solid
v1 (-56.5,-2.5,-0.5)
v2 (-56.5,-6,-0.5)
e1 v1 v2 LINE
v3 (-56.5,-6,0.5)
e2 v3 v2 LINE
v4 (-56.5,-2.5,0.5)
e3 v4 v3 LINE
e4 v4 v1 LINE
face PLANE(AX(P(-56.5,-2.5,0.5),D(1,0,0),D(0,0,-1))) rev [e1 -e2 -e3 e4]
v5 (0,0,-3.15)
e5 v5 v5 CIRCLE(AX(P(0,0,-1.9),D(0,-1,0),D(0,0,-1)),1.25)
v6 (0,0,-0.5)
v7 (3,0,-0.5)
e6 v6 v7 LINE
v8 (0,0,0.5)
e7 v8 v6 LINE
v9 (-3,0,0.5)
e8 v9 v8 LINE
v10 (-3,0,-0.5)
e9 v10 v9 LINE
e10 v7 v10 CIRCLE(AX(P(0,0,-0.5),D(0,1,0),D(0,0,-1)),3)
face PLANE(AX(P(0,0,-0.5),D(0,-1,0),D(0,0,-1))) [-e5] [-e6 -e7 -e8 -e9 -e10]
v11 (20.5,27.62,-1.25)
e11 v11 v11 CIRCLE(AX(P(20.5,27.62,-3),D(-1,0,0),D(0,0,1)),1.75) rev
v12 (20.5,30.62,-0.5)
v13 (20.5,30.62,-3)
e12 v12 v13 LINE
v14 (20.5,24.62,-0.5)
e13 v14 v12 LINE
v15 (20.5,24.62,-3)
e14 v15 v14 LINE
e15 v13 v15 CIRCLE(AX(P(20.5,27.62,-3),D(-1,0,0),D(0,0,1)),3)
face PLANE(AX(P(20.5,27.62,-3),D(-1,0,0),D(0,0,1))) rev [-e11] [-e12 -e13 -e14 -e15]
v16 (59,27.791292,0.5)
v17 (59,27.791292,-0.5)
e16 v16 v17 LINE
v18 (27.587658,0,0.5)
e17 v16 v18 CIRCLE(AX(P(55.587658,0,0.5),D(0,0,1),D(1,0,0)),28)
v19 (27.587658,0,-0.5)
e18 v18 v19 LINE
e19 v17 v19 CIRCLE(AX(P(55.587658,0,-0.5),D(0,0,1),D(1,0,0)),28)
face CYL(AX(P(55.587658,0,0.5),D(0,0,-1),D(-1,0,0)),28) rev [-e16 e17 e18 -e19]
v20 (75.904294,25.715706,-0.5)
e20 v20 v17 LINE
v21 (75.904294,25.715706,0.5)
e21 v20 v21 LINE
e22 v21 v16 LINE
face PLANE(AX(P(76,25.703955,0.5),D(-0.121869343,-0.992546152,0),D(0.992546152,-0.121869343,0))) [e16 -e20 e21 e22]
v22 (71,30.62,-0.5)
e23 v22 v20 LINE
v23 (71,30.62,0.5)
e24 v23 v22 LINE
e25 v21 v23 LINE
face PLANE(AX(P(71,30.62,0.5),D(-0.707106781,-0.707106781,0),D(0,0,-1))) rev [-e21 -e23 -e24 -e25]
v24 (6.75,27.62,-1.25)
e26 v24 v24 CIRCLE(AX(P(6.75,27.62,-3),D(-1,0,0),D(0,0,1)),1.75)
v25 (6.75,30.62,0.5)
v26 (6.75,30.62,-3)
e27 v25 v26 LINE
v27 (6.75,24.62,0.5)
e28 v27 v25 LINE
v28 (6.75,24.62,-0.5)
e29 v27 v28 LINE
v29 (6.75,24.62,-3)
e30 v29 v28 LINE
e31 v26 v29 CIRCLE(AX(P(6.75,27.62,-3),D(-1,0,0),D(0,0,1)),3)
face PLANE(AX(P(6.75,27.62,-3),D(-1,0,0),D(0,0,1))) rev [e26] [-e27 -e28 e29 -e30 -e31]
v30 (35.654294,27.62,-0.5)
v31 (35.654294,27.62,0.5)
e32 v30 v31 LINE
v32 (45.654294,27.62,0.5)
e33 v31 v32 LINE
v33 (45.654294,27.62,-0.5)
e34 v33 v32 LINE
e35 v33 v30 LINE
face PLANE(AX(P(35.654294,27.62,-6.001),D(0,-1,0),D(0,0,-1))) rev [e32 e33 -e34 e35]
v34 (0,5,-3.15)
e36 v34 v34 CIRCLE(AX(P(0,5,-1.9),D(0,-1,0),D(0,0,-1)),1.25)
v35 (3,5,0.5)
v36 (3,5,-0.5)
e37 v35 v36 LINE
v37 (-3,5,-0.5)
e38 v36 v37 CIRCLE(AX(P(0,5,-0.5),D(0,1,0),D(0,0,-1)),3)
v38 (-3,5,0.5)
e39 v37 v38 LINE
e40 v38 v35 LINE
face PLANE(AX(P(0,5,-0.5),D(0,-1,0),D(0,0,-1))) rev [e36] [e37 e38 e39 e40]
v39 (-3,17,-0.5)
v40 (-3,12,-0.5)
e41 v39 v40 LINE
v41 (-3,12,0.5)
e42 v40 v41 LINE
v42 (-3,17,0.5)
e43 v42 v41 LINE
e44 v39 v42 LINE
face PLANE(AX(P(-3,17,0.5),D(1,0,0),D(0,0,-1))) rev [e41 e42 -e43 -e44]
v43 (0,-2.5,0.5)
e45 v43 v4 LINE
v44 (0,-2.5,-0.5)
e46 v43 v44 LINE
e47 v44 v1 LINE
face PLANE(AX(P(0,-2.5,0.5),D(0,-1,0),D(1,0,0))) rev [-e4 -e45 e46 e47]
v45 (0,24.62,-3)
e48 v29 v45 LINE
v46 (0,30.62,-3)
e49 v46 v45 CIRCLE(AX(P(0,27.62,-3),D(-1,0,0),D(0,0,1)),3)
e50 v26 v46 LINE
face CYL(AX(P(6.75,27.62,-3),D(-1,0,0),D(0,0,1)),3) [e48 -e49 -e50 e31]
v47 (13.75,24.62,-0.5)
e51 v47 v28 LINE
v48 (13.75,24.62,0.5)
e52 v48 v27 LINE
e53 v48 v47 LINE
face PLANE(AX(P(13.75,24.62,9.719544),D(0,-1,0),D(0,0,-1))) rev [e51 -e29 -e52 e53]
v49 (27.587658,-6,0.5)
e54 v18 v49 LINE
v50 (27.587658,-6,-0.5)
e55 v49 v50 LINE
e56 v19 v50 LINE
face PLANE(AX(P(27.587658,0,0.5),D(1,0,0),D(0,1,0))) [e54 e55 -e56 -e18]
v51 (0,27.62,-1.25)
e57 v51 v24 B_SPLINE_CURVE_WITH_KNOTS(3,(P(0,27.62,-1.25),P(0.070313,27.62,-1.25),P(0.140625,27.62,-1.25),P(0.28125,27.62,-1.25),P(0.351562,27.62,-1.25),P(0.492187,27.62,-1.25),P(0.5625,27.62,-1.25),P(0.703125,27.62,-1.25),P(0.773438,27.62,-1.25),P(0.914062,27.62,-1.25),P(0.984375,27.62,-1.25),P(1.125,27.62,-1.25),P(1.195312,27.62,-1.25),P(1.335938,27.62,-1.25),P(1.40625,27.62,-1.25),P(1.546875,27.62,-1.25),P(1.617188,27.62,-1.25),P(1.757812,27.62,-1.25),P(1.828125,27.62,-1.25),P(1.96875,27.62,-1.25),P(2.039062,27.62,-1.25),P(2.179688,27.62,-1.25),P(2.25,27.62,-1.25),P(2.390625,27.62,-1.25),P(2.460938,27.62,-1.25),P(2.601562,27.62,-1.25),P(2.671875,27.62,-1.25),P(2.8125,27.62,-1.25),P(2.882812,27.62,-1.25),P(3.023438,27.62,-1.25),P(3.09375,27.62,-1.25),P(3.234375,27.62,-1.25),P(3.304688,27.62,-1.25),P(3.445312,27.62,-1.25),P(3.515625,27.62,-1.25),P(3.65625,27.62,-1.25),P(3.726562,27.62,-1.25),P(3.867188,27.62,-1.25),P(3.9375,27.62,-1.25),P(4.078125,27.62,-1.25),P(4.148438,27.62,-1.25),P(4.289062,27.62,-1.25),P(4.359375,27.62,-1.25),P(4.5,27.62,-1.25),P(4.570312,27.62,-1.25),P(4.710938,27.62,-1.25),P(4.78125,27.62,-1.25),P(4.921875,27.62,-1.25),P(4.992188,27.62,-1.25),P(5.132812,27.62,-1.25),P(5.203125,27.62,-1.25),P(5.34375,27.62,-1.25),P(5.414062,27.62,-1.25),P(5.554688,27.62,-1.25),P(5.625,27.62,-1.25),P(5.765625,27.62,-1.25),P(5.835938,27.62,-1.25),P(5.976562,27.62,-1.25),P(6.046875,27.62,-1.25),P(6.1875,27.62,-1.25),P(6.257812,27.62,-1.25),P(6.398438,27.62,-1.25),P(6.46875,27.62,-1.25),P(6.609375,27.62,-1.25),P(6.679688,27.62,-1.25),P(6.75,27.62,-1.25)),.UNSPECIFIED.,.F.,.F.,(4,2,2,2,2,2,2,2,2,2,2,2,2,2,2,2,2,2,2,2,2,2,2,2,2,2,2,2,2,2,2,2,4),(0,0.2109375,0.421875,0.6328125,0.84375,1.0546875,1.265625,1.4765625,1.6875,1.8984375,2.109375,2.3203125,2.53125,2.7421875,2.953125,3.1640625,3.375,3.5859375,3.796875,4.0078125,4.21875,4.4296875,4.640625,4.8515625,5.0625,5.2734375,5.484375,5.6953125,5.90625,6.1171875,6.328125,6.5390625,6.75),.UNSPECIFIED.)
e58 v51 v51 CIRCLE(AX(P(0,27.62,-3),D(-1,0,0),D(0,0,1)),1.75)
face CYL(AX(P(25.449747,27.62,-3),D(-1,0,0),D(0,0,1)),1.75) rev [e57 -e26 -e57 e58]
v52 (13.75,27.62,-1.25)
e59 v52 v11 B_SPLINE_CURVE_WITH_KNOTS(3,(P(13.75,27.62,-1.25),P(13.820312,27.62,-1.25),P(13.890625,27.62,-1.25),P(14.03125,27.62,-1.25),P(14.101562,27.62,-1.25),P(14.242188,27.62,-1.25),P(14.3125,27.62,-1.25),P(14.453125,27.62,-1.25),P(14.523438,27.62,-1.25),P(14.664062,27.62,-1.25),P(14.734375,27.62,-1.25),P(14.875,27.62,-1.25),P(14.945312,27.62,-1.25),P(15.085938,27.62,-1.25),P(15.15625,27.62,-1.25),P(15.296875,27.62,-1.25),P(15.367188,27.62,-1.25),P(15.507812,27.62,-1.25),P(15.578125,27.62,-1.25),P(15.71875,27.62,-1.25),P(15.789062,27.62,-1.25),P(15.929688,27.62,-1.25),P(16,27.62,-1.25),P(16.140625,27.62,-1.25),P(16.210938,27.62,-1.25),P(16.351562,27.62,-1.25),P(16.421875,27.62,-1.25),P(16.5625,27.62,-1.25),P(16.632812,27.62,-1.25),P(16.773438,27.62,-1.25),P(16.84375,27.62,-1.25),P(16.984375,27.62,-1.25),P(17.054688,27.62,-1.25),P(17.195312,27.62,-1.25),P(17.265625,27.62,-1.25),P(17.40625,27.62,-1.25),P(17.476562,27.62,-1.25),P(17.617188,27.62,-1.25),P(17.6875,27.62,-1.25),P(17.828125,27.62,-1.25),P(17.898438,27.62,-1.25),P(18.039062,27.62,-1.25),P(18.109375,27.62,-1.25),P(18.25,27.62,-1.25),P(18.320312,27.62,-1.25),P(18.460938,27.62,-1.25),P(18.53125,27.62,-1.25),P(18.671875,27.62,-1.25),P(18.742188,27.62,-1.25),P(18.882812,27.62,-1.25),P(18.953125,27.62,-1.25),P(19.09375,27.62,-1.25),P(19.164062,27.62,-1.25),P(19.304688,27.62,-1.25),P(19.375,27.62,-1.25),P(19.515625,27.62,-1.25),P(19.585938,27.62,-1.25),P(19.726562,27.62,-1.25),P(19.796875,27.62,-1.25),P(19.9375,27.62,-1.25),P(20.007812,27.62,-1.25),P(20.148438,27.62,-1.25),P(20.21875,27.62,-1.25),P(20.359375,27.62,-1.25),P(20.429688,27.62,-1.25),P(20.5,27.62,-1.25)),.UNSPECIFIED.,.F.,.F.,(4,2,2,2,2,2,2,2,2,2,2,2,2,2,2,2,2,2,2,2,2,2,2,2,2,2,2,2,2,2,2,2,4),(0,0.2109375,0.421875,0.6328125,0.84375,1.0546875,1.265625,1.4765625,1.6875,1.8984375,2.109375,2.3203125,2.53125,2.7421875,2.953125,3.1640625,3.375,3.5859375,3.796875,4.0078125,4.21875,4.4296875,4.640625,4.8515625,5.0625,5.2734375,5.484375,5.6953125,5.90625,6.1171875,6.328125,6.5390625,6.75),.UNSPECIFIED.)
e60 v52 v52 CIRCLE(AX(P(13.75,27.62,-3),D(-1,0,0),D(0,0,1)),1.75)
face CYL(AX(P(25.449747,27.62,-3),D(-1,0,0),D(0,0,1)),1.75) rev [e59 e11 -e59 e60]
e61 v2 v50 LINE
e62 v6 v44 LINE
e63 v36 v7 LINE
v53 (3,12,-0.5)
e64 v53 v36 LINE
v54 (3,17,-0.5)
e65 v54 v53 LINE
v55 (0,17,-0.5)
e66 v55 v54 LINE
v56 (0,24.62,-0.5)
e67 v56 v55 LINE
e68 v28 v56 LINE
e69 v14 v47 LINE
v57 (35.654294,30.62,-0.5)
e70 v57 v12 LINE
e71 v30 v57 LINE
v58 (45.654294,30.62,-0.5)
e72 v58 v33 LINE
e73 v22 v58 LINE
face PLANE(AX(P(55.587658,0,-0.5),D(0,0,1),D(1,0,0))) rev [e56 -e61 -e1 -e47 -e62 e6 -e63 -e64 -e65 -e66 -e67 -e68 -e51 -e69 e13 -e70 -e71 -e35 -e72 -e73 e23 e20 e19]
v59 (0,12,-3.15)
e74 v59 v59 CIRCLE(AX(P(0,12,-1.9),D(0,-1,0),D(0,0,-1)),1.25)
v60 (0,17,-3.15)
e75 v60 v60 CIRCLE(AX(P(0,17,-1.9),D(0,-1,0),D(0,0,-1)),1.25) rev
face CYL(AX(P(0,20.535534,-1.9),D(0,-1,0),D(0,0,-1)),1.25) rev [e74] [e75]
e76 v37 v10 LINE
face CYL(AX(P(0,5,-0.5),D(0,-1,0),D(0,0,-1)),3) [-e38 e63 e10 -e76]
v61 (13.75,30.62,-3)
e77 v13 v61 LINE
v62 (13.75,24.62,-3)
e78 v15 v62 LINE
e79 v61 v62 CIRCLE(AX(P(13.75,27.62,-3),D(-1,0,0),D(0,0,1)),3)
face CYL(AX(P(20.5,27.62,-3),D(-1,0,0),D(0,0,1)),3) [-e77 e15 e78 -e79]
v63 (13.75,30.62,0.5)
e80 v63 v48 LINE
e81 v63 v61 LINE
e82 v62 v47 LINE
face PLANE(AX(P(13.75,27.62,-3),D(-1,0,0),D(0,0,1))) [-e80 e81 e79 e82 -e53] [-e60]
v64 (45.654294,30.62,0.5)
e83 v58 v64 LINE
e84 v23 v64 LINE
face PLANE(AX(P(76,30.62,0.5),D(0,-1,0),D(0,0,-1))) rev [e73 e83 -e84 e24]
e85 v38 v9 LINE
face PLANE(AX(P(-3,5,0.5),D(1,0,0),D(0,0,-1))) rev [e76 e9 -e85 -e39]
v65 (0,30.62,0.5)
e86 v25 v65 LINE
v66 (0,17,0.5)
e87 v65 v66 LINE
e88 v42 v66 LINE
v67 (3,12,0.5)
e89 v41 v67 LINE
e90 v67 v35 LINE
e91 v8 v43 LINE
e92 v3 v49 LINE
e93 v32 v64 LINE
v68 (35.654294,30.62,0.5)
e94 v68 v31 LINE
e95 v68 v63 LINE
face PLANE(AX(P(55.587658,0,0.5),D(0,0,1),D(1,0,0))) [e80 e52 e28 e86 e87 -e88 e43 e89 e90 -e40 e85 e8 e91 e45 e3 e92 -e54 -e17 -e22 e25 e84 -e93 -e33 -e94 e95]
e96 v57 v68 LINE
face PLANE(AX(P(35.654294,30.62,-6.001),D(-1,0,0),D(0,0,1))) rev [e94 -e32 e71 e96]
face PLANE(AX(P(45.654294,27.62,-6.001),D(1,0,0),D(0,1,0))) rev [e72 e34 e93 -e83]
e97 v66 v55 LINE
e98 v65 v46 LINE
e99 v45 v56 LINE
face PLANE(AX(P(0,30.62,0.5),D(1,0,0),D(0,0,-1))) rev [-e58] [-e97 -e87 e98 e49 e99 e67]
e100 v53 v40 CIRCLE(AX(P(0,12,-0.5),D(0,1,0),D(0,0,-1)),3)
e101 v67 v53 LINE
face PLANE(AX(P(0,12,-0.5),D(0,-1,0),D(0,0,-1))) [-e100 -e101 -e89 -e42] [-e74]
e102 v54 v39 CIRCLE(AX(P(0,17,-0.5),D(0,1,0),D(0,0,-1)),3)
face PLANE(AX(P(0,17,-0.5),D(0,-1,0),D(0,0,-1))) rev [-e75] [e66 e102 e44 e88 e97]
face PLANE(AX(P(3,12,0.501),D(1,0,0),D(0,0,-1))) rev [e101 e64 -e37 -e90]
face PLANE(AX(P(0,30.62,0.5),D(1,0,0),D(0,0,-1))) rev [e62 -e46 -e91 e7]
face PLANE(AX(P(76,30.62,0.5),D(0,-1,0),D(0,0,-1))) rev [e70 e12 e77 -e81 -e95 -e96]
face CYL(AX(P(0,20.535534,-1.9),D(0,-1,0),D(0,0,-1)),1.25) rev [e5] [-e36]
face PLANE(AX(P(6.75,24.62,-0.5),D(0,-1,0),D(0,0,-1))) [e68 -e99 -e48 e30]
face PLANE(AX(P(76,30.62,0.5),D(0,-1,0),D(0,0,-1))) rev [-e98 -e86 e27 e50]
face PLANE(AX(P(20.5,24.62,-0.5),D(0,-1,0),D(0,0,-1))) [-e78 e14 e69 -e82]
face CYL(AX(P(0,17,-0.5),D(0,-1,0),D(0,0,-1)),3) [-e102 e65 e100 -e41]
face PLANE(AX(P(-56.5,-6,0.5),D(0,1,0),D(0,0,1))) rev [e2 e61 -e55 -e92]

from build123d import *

# Parameters (mm, degrees)
BOSS_EXTRUDE1_DEPTH = 0.5
BOSS_EXTRUDE6_DEPTH = 5
BOSS_EXTRUDE5_DEPTH = 6.75
LPATTERN2_COUNT     = 2
LPATTERN2_PITCH     = 13.75
CUT_EXTRUDE4_REACH  = 84.156
SKETCH10_R          = 1.75
LPATTERN3_COUNT     = 2
LPATTERN3_PITCH     = 12
CUT_EXTRUDE5_REACH  = 84.156
SKETCH12_R          = 1.25
SKETCH13_W          = 7
SKETCH13_H          = 6
CUT_EXTRUDE6_DEPTH  = 1
CHAMFER1_SIZE       = 5
CUT_EXTRUDE8_REACH  = 84.105
SKETCH15_W          = 10
SKETCH15_H          = 3
CUT_EXTRUDE9_REACH  = 84.032
SKETCH16_W          = 3
SKETCH16_H          = 7


with BuildPart() as part:
    # Sketch1 → Boss-Extrude1 (new, symmetric)
    with BuildSketch(Plane.XY):
        with BuildLine():
            Line((-56.5, -6), (27.587658385, -6))
            Line((27.587658385, -6), (27.587658385, 0))
            ThreePointArc((27.587658385, 0), (37.034297035, 20.970760182), (59, 27.791292246))
            Line((59, 27.791292246), (76, 25.703954711))
            Line((76, 25.703954711), (76, 30.62))
            Line((76, 30.62), (0, 30.62))
            Line((0, 30.62), (0, -2.5))
            Line((0, -2.5), (-56.5, -2.5))
            Line((-56.5, -2.5), (-56.5, -6))
        make_face()
    extrude(amount=BOSS_EXTRUDE1_DEPTH, both=True)

    # Sketch5 → Boss-Extrude6 (add)
    with BuildSketch(Plane(origin=(0, 0, 0), x_dir=(1, 0, 0), z_dir=(0, 1, 0))):
        with BuildLine():
            Line((0, 0.5), (3, 0.5))
            ThreePointArc((3, 0.5), (0, 3.5), (-3, 0.5))
            Line((-3, 0.5), (-3, -0.5))
            Line((-3, -0.5), (0, -0.5))
            Line((0, -0.5), (0, 0.5))
        make_face()
    boss_extrude6 = extrude(amount=BOSS_EXTRUDE6_DEPTH)

    # Sketch9 → Boss-Extrude5 (add)
    with BuildSketch(Plane.ZY):
        with BuildLine():
            Line((-0.5, 30.62), (-3, 30.62))
            ThreePointArc((-3, 30.62), (-6, 27.62), (-3, 24.62))
            Line((-3, 24.62), (-0.5, 24.62))
            Line((-0.5, 24.62), (-0.5, 30.62))
        make_face()
    boss_extrude5 = extrude(amount=-BOSS_EXTRUDE5_DEPTH)

    # LPattern2: Boss-Extrude5 ×2
    with Locations(*[(i * LPATTERN2_PITCH, 0, 0) for i in range(1, LPATTERN2_COUNT)]):
        add(boss_extrude5)

    # Cut-Extrude4: up to this face of the body (flat: up to its plane)
    cut_extrude4_end = Plane(part.part.faces().sort_by_distance((20.5, 27.62, -2.97425968))[0])
    # Sketch10 → Cut-Extrude4 (cut, up to the picked face)
    with BuildSketch(Plane.ZY, mode=Mode.PRIVATE) as cut_extrude4_sk1:
        with Locations((-3, 27.62)):
            Circle(SKETCH10_R)
    cut_extrude4_tool1 = split(extrude(cut_extrude4_sk1.sketch, amount=-CUT_EXTRUDE4_REACH, mode=Mode.PRIVATE), bisect_by=cut_extrude4_end, keep=Keep.BOTH, mode=Mode.PRIVATE)
    add(cut_extrude4_tool1.solids().sort_by(Axis((0, 27.62, -3), (1, 0, 0)))[0], mode=Mode.SUBTRACT)

    # LPattern3: Boss-Extrude6 ×2
    with Locations(*[(0, i * LPATTERN3_PITCH, 0) for i in range(1, LPATTERN3_COUNT)]):
        add(boss_extrude6)

    # Cut-Extrude5: up to this face of the body (flat: up to its plane)
    cut_extrude5_end = Plane(part.part.faces().sort_by_distance((-0.26258716, 17, -1.462819587))[0])
    # Sketch12 → Cut-Extrude5 (cut, up to the picked face)
    with BuildSketch(Plane.XZ, mode=Mode.PRIVATE) as cut_extrude5_sk1:
        with Locations(Location((0, -1.9, 0), (0, 0, 270))):
            Circle(SKETCH12_R)
    cut_extrude5_tool1 = split(extrude(cut_extrude5_sk1.sketch, amount=-CUT_EXTRUDE5_REACH, mode=Mode.PRIVATE), bisect_by=cut_extrude5_end, keep=Keep.BOTH, mode=Mode.PRIVATE)
    add(cut_extrude5_tool1.solids().sort_by(Axis((0, 0, -1.9), (0, 1, 0)))[0], mode=Mode.SUBTRACT)

    # Sketch13 → Cut-Extrude6 (cut)
    with BuildSketch(Plane(origin=(0, 0, -0.5), x_dir=(-1, 0, 0), z_dir=(0, 0, -1))):
        with Locations((-10.25, 27.62)):
            Rectangle(SKETCH13_W, SKETCH13_H)
    extrude(amount=-CUT_EXTRUDE6_DEPTH, mode=Mode.SUBTRACT)

    # Chamfer1
    # the kernel refuses this chamfer: 5 mm, written as the material it takes off along each edge
    with BuildSketch(Plane(origin=(76, 30.62, 13.35841494), x_dir=(-0.9996219169112968, 0.027495876610586282, 0), z_dir=(0, 0, -1))) as chamfer1_piece_1:
        Polygon((CHAMFER1_SIZE * 0.999621916911, -CHAMFER1_SIZE * 0.0274958766106), (-CHAMFER1_SIZE * 0.0274958766106, -CHAMFER1_SIZE * 0.999621916911), (0, 0), align=None)
    extrude(amount=26.71682988, mode=Mode.SUBTRACT)

    # Sketch15 → Cut-Extrude8 (cut, up to next)
    with BuildSketch(Plane.XY.offset(0.5), mode=Mode.PRIVATE) as cut_extrude8_sk1:
        with Locations((40.65429408, 29.12)):
            Rectangle(SKETCH15_W, SKETCH15_H)
    cut_extrude8_tool1 = extrude(cut_extrude8_sk1.sketch, amount=-CUT_EXTRUDE8_REACH, mode=Mode.PRIVATE) & part.part
    add(cut_extrude8_tool1.solids().sort_by_distance((40.654294, 29.12, 0.5))[0], mode=Mode.SUBTRACT)

    # Sketch16 → Cut-Extrude9 (cut, up to next)
    with BuildSketch(Plane(origin=(0, 0, -0.5), x_dir=(-1, 0, 0), z_dir=(0, 0, -1)), mode=Mode.PRIVATE) as cut_extrude9_sk1:
        with Locations((-1.5, 8.5)):
            Rectangle(SKETCH16_W, SKETCH16_H)
    cut_extrude9_tool1 = extrude(cut_extrude9_sk1.sketch, amount=-CUT_EXTRUDE9_REACH, mode=Mode.PRIVATE) & part.part
    add(cut_extrude9_tool1.solids().sort_by_distance((1.5, 8.5, -0.5))[0], mode=Mode.SUBTRACT)


solid = part.part
